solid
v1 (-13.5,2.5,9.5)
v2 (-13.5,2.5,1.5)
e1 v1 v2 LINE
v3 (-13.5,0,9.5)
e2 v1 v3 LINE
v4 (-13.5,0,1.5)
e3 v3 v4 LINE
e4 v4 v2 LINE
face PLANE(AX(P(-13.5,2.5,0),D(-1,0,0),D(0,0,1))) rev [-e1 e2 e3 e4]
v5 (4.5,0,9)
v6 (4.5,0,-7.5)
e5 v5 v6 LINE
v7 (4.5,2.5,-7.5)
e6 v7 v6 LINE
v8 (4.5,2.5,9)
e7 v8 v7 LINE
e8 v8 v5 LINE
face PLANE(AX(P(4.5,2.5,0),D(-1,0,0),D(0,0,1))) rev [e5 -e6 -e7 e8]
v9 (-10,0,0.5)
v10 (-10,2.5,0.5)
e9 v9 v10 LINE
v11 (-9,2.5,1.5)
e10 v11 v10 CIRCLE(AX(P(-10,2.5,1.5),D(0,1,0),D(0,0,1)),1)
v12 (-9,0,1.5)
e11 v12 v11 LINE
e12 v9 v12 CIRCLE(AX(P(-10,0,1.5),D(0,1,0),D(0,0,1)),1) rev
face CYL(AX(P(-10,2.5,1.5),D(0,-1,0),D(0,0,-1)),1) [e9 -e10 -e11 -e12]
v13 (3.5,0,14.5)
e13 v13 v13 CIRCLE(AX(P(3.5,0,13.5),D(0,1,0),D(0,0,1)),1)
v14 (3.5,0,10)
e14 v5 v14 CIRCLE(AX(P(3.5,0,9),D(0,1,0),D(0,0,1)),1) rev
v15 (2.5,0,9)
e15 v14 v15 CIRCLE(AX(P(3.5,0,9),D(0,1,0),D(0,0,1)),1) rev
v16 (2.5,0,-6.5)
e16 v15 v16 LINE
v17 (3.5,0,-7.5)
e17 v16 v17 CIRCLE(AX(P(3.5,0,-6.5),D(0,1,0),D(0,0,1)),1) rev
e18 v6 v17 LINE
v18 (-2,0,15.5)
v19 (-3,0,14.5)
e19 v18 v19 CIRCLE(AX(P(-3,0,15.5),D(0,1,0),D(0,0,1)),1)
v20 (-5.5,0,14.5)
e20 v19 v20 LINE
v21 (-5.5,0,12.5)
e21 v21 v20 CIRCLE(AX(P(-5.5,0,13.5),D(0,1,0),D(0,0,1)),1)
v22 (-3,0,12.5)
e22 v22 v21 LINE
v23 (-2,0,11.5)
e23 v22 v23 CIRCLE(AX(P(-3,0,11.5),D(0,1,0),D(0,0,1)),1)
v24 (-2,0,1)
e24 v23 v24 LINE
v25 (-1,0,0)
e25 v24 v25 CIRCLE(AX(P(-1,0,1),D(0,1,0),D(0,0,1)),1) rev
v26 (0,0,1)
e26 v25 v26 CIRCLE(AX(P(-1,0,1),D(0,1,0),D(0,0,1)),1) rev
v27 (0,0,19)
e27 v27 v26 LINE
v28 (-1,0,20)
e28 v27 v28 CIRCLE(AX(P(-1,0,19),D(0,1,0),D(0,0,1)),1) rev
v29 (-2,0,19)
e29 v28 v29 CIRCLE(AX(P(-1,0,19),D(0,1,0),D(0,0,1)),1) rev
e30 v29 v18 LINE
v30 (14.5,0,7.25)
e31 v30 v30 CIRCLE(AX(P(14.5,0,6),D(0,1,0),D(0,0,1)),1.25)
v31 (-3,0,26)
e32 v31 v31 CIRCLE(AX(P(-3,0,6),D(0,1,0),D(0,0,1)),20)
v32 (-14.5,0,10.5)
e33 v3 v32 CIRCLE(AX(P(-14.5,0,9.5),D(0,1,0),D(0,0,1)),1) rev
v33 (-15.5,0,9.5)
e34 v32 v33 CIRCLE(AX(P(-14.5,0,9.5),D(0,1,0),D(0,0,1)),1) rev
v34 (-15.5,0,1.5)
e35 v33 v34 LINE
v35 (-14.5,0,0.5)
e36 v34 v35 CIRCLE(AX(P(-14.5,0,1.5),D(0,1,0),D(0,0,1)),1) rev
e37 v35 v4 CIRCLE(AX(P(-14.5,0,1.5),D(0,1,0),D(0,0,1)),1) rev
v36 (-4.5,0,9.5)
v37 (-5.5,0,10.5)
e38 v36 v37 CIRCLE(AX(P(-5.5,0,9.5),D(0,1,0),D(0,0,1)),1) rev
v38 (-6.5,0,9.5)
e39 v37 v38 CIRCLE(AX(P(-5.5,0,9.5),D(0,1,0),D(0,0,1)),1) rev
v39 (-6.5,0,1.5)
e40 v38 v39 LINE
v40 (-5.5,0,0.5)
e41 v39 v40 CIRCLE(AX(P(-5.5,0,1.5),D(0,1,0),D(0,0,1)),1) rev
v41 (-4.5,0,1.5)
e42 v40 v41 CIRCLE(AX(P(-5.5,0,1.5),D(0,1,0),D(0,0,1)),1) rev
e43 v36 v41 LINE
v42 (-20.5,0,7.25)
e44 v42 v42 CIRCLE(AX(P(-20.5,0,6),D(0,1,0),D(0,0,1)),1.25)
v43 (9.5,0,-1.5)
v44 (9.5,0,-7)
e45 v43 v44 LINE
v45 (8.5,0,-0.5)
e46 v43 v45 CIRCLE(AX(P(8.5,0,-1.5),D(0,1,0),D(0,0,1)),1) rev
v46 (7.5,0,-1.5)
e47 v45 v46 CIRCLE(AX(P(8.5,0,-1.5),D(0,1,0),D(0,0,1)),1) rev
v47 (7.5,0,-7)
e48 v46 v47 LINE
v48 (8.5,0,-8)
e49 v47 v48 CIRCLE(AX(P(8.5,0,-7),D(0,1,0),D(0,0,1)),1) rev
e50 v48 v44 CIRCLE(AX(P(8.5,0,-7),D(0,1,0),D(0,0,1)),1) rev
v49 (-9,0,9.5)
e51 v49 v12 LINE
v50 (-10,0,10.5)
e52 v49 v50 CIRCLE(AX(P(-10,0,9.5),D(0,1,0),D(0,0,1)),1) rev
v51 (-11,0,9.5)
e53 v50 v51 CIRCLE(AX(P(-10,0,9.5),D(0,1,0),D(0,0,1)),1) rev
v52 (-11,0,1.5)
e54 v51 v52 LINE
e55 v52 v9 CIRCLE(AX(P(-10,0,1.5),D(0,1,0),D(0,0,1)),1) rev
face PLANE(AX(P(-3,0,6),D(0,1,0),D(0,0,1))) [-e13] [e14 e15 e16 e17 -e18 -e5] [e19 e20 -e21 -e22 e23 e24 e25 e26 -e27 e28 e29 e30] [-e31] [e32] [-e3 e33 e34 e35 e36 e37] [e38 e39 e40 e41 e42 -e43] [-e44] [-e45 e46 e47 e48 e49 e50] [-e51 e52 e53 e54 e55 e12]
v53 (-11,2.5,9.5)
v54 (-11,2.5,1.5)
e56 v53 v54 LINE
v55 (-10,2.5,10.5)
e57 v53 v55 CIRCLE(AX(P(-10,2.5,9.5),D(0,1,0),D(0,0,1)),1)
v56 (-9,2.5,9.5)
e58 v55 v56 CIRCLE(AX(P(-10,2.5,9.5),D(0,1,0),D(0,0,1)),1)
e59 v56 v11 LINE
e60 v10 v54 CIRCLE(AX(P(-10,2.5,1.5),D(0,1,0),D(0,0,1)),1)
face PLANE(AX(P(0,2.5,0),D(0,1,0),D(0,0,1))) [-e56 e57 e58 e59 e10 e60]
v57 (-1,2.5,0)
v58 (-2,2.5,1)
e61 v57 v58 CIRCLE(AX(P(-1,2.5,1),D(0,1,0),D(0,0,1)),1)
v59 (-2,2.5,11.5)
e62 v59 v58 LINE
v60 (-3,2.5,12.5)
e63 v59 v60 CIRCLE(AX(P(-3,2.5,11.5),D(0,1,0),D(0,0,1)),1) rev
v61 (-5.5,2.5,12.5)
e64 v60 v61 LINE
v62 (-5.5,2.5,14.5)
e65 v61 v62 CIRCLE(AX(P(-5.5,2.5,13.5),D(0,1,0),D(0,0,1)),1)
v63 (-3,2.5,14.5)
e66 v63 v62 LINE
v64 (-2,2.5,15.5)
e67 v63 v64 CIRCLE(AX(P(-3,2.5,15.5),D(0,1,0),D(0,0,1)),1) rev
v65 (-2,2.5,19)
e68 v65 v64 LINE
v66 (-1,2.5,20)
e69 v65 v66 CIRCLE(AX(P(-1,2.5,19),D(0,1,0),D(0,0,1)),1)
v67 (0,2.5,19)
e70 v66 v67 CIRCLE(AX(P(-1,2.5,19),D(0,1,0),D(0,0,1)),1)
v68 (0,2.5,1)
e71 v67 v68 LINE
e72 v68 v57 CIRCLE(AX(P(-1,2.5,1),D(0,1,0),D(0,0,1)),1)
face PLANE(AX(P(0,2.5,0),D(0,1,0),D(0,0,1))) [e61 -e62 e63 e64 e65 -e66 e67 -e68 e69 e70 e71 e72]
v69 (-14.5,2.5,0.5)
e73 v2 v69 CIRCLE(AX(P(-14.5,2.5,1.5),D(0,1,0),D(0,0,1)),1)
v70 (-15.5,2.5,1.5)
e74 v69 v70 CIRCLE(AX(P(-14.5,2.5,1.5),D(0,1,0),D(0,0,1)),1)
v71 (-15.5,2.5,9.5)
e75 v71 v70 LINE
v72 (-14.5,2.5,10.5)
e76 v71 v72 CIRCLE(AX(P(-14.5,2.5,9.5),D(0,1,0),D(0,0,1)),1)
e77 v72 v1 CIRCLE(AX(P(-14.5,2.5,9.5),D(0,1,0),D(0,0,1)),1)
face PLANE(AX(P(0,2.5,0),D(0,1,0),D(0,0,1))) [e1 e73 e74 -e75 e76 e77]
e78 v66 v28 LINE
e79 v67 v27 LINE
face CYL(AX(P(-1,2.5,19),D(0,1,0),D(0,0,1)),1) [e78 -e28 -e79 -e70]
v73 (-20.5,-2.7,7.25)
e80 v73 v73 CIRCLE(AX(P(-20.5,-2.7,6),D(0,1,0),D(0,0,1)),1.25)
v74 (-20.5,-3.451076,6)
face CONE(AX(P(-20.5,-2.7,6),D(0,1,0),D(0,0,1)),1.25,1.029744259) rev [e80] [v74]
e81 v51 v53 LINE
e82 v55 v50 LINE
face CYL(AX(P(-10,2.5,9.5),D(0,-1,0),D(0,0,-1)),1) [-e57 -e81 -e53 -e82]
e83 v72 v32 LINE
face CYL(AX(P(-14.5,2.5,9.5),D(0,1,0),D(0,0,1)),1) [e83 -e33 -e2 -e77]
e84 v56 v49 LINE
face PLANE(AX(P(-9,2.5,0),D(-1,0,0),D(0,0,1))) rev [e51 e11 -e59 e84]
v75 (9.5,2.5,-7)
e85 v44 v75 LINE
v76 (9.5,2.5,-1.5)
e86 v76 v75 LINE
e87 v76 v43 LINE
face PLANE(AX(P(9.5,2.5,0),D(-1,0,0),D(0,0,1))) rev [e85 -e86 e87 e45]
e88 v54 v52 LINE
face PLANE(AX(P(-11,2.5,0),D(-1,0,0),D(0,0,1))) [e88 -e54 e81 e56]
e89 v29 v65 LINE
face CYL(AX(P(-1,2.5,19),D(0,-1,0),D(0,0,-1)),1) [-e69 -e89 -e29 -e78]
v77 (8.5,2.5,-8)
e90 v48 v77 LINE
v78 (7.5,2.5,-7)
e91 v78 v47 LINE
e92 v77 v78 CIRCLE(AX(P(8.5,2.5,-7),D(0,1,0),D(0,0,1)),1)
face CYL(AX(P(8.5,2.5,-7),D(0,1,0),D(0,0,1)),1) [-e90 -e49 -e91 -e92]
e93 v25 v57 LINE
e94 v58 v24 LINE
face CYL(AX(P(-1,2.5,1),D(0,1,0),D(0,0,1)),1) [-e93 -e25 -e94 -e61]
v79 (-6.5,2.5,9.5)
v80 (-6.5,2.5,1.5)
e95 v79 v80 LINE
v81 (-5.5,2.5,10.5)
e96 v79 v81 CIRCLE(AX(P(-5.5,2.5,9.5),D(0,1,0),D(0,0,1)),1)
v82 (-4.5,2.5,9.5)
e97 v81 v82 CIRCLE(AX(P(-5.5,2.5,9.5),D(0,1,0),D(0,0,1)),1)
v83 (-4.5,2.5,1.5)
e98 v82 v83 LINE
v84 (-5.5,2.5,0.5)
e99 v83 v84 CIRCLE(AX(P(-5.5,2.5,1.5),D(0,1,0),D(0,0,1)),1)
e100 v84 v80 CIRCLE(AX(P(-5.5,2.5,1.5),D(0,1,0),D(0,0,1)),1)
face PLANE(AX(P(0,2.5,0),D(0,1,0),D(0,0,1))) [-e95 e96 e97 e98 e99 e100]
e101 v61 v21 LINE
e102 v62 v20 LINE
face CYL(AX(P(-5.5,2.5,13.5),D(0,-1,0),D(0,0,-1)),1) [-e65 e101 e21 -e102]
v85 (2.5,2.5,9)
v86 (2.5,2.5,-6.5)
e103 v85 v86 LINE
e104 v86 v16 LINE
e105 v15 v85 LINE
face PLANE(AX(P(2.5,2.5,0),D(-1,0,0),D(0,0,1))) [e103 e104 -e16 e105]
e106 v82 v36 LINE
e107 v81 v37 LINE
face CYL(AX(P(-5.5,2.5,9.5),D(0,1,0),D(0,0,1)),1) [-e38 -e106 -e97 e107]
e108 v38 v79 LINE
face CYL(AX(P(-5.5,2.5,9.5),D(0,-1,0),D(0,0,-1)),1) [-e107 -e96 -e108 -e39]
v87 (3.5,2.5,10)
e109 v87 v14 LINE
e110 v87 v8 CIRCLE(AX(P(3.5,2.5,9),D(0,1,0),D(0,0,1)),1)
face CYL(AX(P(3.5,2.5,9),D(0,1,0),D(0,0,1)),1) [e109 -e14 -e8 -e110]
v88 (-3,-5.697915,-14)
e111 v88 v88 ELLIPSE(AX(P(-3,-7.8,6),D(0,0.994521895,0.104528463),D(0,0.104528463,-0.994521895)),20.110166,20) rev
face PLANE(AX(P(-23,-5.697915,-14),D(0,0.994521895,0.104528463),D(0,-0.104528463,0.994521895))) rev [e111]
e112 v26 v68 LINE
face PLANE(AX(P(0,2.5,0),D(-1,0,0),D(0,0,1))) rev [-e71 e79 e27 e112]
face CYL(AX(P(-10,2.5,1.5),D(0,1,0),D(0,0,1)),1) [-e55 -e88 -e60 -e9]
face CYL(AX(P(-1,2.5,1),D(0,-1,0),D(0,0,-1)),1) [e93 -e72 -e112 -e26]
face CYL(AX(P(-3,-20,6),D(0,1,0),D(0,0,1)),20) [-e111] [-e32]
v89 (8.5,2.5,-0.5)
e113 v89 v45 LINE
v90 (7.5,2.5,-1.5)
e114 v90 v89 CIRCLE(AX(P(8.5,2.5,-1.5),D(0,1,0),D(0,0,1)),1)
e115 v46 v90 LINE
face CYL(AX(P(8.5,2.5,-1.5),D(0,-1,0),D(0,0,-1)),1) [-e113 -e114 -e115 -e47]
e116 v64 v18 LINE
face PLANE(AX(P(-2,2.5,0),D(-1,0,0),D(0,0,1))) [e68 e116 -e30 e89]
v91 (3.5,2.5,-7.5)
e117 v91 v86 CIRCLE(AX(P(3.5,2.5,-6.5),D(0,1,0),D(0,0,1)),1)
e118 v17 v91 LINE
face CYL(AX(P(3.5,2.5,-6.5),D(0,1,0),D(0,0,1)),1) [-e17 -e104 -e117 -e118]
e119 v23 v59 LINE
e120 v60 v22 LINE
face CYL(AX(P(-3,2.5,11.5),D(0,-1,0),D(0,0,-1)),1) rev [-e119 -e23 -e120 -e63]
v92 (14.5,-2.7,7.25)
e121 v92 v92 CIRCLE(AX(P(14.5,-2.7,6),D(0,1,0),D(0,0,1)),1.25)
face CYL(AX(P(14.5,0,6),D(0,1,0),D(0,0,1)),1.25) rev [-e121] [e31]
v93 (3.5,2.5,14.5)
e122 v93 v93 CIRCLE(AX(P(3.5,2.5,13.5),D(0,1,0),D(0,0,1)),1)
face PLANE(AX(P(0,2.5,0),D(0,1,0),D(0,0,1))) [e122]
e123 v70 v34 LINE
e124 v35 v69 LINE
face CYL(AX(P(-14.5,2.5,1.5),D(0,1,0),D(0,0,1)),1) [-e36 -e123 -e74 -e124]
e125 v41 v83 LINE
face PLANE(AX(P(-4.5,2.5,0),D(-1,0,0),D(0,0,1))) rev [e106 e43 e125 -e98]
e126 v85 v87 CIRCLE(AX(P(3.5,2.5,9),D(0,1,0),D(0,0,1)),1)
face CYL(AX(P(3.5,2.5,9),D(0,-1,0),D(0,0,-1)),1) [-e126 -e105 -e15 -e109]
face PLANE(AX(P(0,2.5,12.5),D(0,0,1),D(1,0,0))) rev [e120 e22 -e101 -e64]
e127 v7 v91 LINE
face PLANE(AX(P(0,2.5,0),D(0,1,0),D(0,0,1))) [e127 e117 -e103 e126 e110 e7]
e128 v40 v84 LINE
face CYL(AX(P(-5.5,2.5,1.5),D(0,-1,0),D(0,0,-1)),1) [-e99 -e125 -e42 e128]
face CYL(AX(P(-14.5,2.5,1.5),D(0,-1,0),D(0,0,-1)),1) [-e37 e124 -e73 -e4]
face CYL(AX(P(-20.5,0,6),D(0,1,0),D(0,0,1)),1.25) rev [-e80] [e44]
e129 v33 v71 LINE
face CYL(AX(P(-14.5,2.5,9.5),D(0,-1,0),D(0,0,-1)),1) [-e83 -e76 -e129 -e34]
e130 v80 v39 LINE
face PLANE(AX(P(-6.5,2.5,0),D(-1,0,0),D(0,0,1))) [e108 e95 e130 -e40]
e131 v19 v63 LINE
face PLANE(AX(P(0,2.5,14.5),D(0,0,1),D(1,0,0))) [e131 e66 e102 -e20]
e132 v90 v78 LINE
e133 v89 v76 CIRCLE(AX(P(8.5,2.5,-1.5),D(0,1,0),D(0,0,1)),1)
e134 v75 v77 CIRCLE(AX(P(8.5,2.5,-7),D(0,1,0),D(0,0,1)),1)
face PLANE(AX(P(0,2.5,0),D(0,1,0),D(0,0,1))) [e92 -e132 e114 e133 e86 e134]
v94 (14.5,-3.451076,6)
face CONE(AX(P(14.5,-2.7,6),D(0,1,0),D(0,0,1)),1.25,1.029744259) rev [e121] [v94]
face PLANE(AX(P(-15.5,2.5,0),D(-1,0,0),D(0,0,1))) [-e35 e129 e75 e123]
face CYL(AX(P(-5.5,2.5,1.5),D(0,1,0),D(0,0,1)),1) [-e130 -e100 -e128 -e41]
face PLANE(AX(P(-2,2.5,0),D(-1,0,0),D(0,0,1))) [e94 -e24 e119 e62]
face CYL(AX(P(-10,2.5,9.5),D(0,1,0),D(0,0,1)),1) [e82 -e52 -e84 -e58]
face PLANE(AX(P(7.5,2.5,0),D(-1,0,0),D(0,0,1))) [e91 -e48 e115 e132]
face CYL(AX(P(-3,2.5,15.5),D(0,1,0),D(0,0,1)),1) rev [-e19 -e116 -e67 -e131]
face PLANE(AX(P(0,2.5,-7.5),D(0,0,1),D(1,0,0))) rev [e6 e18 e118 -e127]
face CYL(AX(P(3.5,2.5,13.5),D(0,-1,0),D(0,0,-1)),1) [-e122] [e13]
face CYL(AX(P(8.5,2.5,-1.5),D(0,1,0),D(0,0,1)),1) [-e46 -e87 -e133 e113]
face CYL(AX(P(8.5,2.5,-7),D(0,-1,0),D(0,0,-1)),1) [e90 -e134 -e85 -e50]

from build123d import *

# Parameters (mm, degrees)
BOSS_EXTRUDE2_DEPTH       = 2.5
SKETCH1_R                 = 1
BOSS_EXTRUDE2_2_DEPTH     = 2.5
SKETCH1_W                 = 2
SKETCH1_H                 = 17.5
BOSS_EXTRUDE2_3_DEPTH     = 2.5
SKETCH1_H_2               = 10
BOSS_EXTRUDE2_4_DEPTH     = 2.5
BOSS_EXTRUDE2_5_DEPTH     = 2.5
BOSS_EXTRUDE2_6_DEPTH     = 2.5
SKETCH1_H_3               = 7.5
BOSS_EXTRUDE2_7_DEPTH     = 2.5
SKETCH1_6_R               = 20
BOSS_EXTRUDE3_DEPTH       = 20
CUT_EXTRUDE1_START        = -27.5000001
CUT_EXTRUDE1_DEPTH        = 40.0000001
FILLET1_R                 = 1
M3X0_5_TAPPED_HOLE1_D     = 2.5
M3X0_5_TAPPED_HOLE1_DEPTH = 2.7
M3X0_5_TAPPED_HOLE1_TIP   = 0.751075774


# Read off the part's stored shape, not the designer's step: Cut-Extrude1
with BuildPart() as part:
    # Sketch1 → Boss-Extrude2 (new body)
    with BuildSketch(Plane(origin=(0, 0, 0), x_dir=(1, 0, 0), z_dir=(0, 1, 0))):
        with BuildLine():
            Line((-2, -20), (0, -20))
            Line((0, -20), (0, 0))
            Line((0, 0), (-2, 0))
            Line((-2, 0), (-2, -12.5))
            Line((-2, -12.5), (-5.5, -12.5))
            ThreePointArc((-5.5, -12.5), (-6.5, -13.5), (-5.5, -14.5))
            Line((-5.5, -14.5), (-2, -14.5))
            Line((-2, -14.5), (-2, -20))
        make_face()
    extrude(amount=BOSS_EXTRUDE2_DEPTH)



with BuildPart() as body_2:
    # Sketch1 → Boss-Extrude2 2 (new body)
    with BuildSketch(Plane(origin=(0, 0, 0), x_dir=(1, 0, 0), z_dir=(0, 1, 0))):
        with Locations(Location((3.5, -13.5, 0), (0, 0, 270))):
            Circle(SKETCH1_R)
    extrude(amount=BOSS_EXTRUDE2_2_DEPTH)


with BuildPart() as body_3:
    # Sketch1 → Boss-Extrude2 3 (new body)
    with BuildSketch(Plane(origin=(0, 0, 0), x_dir=(1, 0, 0), z_dir=(0, 1, 0))):
        with Locations((3.5, -1.25)):
            Rectangle(SKETCH1_W, SKETCH1_H)
    extrude(amount=BOSS_EXTRUDE2_3_DEPTH)


with BuildPart() as body_4:
    # Sketch1 → Boss-Extrude2 4 (new body)
    with BuildSketch(Plane(origin=(0, 0, 0), x_dir=(1, 0, 0), z_dir=(0, 1, 0))):
        with Locations((-5.5, -5.5)):
            Rectangle(SKETCH1_W, SKETCH1_H_2)
    extrude(amount=BOSS_EXTRUDE2_4_DEPTH)


with BuildPart() as body_5:
    # Sketch1 → Boss-Extrude2 5 (new body)
    with BuildSketch(Plane(origin=(0, 0, 0), x_dir=(1, 0, 0), z_dir=(0, 1, 0))):
        with Locations((-10, -5.5)):
            Rectangle(SKETCH1_W, SKETCH1_H_2)
    extrude(amount=BOSS_EXTRUDE2_5_DEPTH)


with BuildPart() as body_6:
    # Sketch1 → Boss-Extrude2 6 (new body)
    with BuildSketch(Plane(origin=(0, 0, 0), x_dir=(1, 0, 0), z_dir=(0, 1, 0))):
        with Locations((-14.5, -5.5)):
            Rectangle(SKETCH1_W, SKETCH1_H_2)
    extrude(amount=BOSS_EXTRUDE2_6_DEPTH)


with BuildPart() as body_7:
    # Sketch1 → Boss-Extrude2 7 (new body)
    with BuildSketch(Plane(origin=(0, 0, 0), x_dir=(1, 0, 0), z_dir=(0, 1, 0))):
        with Locations((8.5, 4.25)):
            Rectangle(SKETCH1_W, SKETCH1_H_3)
    extrude(amount=BOSS_EXTRUDE2_7_DEPTH)


with BuildPart() as part_1:
    add(part.part)

    add(body_2.part)  # Boss-Extrude3 merges body 2

    add(body_3.part)  # Boss-Extrude3 merges body 3

    add(body_4.part)  # Boss-Extrude3 merges body 4

    add(body_5.part)  # Boss-Extrude3 merges body 5

    add(body_6.part)  # Boss-Extrude3 merges body 6

    add(body_7.part)  # Boss-Extrude3 merges body 7
    # Sketch1<6> → Boss-Extrude3 (add)
    with BuildSketch(Plane(origin=(0, 0, 0), x_dir=(1, 0, 0), z_dir=(0, 1, 0))):
        with Locations(Location((-3, -6, 0), (0, 0, 270))):
            Circle(SKETCH1_6_R)
    extrude(amount=-BOSS_EXTRUDE3_DEPTH)

    # Cut-Extrude1 outline → Cut-Extrude1 (cut)
    with BuildSketch(Plane(origin=(4.5, 0, 0), x_dir=(0, 0, -1), z_dir=(1, 0, 0)).offset(CUT_EXTRUDE1_START)):
        Polygon((14, -20), (14, -5.697915295), (-26, -9.902084705), (-26, -20), align=None)
    extrude(amount=CUT_EXTRUDE1_DEPTH, mode=Mode.SUBTRACT)

    # Fillet1
    fillet1_edges = [part_1.edges().sort_by_distance(p)[0] for p in [
        (-13.5, 1.25, 10.5),
        (-13.5, 1.25, 0.5),
        (-9, 1.25, 0.5),
        (-9, 1.25, 10.5),
        (-4.5, 1.25, 0.5),
        (-4.5, 1.25, 10.5),
        (0, 1.25, 20),
        (0, 1.25, 0),
        (9.5, 1.25, -8),
        (9.5, 1.25, -0.5),
        (4.5, 1.25, 10),
        (-15.5, 1.25, 0.5),
        (-15.5, 1.25, 10.5),
        (-11, 1.25, 0.5),
        (-11, 1.25, 10.5),
        (-6.5, 1.25, 0.5),
        (-6.5, 1.25, 10.5),
        (7.5, 1.25, -0.5),
        (7.5, 1.25, -8),
        (2.5, 1.25, -7.5),
        (2.5, 1.25, 10),
        (-2, 1.25, 0),
        (-2, 1.25, 14.5),
        (-2, 1.25, 20),
        (-2, 1.25, 12.5),
    ]]
    fillet(fillet1_edges, radius=FILLET1_R - 0.0001)  # a hair under: the kernel refuses the full size

    # M3x0.5 Tapped Hole1
    with Locations(Plane(origin=(14.5, 0, 6), x_dir=(0, 0, 1), z_dir=(0, 1, 0))):
        with Locations((0, 0), (0, -35)):
            Hole(M3X0_5_TAPPED_HOLE1_D / 2, depth=M3X0_5_TAPPED_HOLE1_DEPTH)
            with Locations((0, 0, -(M3X0_5_TAPPED_HOLE1_DEPTH + M3X0_5_TAPPED_HOLE1_TIP / 2))):  # 118° drill point
                Cone(0, M3X0_5_TAPPED_HOLE1_D / 2, M3X0_5_TAPPED_HOLE1_TIP, mode=Mode.SUBTRACT)


solid = part_1.part
